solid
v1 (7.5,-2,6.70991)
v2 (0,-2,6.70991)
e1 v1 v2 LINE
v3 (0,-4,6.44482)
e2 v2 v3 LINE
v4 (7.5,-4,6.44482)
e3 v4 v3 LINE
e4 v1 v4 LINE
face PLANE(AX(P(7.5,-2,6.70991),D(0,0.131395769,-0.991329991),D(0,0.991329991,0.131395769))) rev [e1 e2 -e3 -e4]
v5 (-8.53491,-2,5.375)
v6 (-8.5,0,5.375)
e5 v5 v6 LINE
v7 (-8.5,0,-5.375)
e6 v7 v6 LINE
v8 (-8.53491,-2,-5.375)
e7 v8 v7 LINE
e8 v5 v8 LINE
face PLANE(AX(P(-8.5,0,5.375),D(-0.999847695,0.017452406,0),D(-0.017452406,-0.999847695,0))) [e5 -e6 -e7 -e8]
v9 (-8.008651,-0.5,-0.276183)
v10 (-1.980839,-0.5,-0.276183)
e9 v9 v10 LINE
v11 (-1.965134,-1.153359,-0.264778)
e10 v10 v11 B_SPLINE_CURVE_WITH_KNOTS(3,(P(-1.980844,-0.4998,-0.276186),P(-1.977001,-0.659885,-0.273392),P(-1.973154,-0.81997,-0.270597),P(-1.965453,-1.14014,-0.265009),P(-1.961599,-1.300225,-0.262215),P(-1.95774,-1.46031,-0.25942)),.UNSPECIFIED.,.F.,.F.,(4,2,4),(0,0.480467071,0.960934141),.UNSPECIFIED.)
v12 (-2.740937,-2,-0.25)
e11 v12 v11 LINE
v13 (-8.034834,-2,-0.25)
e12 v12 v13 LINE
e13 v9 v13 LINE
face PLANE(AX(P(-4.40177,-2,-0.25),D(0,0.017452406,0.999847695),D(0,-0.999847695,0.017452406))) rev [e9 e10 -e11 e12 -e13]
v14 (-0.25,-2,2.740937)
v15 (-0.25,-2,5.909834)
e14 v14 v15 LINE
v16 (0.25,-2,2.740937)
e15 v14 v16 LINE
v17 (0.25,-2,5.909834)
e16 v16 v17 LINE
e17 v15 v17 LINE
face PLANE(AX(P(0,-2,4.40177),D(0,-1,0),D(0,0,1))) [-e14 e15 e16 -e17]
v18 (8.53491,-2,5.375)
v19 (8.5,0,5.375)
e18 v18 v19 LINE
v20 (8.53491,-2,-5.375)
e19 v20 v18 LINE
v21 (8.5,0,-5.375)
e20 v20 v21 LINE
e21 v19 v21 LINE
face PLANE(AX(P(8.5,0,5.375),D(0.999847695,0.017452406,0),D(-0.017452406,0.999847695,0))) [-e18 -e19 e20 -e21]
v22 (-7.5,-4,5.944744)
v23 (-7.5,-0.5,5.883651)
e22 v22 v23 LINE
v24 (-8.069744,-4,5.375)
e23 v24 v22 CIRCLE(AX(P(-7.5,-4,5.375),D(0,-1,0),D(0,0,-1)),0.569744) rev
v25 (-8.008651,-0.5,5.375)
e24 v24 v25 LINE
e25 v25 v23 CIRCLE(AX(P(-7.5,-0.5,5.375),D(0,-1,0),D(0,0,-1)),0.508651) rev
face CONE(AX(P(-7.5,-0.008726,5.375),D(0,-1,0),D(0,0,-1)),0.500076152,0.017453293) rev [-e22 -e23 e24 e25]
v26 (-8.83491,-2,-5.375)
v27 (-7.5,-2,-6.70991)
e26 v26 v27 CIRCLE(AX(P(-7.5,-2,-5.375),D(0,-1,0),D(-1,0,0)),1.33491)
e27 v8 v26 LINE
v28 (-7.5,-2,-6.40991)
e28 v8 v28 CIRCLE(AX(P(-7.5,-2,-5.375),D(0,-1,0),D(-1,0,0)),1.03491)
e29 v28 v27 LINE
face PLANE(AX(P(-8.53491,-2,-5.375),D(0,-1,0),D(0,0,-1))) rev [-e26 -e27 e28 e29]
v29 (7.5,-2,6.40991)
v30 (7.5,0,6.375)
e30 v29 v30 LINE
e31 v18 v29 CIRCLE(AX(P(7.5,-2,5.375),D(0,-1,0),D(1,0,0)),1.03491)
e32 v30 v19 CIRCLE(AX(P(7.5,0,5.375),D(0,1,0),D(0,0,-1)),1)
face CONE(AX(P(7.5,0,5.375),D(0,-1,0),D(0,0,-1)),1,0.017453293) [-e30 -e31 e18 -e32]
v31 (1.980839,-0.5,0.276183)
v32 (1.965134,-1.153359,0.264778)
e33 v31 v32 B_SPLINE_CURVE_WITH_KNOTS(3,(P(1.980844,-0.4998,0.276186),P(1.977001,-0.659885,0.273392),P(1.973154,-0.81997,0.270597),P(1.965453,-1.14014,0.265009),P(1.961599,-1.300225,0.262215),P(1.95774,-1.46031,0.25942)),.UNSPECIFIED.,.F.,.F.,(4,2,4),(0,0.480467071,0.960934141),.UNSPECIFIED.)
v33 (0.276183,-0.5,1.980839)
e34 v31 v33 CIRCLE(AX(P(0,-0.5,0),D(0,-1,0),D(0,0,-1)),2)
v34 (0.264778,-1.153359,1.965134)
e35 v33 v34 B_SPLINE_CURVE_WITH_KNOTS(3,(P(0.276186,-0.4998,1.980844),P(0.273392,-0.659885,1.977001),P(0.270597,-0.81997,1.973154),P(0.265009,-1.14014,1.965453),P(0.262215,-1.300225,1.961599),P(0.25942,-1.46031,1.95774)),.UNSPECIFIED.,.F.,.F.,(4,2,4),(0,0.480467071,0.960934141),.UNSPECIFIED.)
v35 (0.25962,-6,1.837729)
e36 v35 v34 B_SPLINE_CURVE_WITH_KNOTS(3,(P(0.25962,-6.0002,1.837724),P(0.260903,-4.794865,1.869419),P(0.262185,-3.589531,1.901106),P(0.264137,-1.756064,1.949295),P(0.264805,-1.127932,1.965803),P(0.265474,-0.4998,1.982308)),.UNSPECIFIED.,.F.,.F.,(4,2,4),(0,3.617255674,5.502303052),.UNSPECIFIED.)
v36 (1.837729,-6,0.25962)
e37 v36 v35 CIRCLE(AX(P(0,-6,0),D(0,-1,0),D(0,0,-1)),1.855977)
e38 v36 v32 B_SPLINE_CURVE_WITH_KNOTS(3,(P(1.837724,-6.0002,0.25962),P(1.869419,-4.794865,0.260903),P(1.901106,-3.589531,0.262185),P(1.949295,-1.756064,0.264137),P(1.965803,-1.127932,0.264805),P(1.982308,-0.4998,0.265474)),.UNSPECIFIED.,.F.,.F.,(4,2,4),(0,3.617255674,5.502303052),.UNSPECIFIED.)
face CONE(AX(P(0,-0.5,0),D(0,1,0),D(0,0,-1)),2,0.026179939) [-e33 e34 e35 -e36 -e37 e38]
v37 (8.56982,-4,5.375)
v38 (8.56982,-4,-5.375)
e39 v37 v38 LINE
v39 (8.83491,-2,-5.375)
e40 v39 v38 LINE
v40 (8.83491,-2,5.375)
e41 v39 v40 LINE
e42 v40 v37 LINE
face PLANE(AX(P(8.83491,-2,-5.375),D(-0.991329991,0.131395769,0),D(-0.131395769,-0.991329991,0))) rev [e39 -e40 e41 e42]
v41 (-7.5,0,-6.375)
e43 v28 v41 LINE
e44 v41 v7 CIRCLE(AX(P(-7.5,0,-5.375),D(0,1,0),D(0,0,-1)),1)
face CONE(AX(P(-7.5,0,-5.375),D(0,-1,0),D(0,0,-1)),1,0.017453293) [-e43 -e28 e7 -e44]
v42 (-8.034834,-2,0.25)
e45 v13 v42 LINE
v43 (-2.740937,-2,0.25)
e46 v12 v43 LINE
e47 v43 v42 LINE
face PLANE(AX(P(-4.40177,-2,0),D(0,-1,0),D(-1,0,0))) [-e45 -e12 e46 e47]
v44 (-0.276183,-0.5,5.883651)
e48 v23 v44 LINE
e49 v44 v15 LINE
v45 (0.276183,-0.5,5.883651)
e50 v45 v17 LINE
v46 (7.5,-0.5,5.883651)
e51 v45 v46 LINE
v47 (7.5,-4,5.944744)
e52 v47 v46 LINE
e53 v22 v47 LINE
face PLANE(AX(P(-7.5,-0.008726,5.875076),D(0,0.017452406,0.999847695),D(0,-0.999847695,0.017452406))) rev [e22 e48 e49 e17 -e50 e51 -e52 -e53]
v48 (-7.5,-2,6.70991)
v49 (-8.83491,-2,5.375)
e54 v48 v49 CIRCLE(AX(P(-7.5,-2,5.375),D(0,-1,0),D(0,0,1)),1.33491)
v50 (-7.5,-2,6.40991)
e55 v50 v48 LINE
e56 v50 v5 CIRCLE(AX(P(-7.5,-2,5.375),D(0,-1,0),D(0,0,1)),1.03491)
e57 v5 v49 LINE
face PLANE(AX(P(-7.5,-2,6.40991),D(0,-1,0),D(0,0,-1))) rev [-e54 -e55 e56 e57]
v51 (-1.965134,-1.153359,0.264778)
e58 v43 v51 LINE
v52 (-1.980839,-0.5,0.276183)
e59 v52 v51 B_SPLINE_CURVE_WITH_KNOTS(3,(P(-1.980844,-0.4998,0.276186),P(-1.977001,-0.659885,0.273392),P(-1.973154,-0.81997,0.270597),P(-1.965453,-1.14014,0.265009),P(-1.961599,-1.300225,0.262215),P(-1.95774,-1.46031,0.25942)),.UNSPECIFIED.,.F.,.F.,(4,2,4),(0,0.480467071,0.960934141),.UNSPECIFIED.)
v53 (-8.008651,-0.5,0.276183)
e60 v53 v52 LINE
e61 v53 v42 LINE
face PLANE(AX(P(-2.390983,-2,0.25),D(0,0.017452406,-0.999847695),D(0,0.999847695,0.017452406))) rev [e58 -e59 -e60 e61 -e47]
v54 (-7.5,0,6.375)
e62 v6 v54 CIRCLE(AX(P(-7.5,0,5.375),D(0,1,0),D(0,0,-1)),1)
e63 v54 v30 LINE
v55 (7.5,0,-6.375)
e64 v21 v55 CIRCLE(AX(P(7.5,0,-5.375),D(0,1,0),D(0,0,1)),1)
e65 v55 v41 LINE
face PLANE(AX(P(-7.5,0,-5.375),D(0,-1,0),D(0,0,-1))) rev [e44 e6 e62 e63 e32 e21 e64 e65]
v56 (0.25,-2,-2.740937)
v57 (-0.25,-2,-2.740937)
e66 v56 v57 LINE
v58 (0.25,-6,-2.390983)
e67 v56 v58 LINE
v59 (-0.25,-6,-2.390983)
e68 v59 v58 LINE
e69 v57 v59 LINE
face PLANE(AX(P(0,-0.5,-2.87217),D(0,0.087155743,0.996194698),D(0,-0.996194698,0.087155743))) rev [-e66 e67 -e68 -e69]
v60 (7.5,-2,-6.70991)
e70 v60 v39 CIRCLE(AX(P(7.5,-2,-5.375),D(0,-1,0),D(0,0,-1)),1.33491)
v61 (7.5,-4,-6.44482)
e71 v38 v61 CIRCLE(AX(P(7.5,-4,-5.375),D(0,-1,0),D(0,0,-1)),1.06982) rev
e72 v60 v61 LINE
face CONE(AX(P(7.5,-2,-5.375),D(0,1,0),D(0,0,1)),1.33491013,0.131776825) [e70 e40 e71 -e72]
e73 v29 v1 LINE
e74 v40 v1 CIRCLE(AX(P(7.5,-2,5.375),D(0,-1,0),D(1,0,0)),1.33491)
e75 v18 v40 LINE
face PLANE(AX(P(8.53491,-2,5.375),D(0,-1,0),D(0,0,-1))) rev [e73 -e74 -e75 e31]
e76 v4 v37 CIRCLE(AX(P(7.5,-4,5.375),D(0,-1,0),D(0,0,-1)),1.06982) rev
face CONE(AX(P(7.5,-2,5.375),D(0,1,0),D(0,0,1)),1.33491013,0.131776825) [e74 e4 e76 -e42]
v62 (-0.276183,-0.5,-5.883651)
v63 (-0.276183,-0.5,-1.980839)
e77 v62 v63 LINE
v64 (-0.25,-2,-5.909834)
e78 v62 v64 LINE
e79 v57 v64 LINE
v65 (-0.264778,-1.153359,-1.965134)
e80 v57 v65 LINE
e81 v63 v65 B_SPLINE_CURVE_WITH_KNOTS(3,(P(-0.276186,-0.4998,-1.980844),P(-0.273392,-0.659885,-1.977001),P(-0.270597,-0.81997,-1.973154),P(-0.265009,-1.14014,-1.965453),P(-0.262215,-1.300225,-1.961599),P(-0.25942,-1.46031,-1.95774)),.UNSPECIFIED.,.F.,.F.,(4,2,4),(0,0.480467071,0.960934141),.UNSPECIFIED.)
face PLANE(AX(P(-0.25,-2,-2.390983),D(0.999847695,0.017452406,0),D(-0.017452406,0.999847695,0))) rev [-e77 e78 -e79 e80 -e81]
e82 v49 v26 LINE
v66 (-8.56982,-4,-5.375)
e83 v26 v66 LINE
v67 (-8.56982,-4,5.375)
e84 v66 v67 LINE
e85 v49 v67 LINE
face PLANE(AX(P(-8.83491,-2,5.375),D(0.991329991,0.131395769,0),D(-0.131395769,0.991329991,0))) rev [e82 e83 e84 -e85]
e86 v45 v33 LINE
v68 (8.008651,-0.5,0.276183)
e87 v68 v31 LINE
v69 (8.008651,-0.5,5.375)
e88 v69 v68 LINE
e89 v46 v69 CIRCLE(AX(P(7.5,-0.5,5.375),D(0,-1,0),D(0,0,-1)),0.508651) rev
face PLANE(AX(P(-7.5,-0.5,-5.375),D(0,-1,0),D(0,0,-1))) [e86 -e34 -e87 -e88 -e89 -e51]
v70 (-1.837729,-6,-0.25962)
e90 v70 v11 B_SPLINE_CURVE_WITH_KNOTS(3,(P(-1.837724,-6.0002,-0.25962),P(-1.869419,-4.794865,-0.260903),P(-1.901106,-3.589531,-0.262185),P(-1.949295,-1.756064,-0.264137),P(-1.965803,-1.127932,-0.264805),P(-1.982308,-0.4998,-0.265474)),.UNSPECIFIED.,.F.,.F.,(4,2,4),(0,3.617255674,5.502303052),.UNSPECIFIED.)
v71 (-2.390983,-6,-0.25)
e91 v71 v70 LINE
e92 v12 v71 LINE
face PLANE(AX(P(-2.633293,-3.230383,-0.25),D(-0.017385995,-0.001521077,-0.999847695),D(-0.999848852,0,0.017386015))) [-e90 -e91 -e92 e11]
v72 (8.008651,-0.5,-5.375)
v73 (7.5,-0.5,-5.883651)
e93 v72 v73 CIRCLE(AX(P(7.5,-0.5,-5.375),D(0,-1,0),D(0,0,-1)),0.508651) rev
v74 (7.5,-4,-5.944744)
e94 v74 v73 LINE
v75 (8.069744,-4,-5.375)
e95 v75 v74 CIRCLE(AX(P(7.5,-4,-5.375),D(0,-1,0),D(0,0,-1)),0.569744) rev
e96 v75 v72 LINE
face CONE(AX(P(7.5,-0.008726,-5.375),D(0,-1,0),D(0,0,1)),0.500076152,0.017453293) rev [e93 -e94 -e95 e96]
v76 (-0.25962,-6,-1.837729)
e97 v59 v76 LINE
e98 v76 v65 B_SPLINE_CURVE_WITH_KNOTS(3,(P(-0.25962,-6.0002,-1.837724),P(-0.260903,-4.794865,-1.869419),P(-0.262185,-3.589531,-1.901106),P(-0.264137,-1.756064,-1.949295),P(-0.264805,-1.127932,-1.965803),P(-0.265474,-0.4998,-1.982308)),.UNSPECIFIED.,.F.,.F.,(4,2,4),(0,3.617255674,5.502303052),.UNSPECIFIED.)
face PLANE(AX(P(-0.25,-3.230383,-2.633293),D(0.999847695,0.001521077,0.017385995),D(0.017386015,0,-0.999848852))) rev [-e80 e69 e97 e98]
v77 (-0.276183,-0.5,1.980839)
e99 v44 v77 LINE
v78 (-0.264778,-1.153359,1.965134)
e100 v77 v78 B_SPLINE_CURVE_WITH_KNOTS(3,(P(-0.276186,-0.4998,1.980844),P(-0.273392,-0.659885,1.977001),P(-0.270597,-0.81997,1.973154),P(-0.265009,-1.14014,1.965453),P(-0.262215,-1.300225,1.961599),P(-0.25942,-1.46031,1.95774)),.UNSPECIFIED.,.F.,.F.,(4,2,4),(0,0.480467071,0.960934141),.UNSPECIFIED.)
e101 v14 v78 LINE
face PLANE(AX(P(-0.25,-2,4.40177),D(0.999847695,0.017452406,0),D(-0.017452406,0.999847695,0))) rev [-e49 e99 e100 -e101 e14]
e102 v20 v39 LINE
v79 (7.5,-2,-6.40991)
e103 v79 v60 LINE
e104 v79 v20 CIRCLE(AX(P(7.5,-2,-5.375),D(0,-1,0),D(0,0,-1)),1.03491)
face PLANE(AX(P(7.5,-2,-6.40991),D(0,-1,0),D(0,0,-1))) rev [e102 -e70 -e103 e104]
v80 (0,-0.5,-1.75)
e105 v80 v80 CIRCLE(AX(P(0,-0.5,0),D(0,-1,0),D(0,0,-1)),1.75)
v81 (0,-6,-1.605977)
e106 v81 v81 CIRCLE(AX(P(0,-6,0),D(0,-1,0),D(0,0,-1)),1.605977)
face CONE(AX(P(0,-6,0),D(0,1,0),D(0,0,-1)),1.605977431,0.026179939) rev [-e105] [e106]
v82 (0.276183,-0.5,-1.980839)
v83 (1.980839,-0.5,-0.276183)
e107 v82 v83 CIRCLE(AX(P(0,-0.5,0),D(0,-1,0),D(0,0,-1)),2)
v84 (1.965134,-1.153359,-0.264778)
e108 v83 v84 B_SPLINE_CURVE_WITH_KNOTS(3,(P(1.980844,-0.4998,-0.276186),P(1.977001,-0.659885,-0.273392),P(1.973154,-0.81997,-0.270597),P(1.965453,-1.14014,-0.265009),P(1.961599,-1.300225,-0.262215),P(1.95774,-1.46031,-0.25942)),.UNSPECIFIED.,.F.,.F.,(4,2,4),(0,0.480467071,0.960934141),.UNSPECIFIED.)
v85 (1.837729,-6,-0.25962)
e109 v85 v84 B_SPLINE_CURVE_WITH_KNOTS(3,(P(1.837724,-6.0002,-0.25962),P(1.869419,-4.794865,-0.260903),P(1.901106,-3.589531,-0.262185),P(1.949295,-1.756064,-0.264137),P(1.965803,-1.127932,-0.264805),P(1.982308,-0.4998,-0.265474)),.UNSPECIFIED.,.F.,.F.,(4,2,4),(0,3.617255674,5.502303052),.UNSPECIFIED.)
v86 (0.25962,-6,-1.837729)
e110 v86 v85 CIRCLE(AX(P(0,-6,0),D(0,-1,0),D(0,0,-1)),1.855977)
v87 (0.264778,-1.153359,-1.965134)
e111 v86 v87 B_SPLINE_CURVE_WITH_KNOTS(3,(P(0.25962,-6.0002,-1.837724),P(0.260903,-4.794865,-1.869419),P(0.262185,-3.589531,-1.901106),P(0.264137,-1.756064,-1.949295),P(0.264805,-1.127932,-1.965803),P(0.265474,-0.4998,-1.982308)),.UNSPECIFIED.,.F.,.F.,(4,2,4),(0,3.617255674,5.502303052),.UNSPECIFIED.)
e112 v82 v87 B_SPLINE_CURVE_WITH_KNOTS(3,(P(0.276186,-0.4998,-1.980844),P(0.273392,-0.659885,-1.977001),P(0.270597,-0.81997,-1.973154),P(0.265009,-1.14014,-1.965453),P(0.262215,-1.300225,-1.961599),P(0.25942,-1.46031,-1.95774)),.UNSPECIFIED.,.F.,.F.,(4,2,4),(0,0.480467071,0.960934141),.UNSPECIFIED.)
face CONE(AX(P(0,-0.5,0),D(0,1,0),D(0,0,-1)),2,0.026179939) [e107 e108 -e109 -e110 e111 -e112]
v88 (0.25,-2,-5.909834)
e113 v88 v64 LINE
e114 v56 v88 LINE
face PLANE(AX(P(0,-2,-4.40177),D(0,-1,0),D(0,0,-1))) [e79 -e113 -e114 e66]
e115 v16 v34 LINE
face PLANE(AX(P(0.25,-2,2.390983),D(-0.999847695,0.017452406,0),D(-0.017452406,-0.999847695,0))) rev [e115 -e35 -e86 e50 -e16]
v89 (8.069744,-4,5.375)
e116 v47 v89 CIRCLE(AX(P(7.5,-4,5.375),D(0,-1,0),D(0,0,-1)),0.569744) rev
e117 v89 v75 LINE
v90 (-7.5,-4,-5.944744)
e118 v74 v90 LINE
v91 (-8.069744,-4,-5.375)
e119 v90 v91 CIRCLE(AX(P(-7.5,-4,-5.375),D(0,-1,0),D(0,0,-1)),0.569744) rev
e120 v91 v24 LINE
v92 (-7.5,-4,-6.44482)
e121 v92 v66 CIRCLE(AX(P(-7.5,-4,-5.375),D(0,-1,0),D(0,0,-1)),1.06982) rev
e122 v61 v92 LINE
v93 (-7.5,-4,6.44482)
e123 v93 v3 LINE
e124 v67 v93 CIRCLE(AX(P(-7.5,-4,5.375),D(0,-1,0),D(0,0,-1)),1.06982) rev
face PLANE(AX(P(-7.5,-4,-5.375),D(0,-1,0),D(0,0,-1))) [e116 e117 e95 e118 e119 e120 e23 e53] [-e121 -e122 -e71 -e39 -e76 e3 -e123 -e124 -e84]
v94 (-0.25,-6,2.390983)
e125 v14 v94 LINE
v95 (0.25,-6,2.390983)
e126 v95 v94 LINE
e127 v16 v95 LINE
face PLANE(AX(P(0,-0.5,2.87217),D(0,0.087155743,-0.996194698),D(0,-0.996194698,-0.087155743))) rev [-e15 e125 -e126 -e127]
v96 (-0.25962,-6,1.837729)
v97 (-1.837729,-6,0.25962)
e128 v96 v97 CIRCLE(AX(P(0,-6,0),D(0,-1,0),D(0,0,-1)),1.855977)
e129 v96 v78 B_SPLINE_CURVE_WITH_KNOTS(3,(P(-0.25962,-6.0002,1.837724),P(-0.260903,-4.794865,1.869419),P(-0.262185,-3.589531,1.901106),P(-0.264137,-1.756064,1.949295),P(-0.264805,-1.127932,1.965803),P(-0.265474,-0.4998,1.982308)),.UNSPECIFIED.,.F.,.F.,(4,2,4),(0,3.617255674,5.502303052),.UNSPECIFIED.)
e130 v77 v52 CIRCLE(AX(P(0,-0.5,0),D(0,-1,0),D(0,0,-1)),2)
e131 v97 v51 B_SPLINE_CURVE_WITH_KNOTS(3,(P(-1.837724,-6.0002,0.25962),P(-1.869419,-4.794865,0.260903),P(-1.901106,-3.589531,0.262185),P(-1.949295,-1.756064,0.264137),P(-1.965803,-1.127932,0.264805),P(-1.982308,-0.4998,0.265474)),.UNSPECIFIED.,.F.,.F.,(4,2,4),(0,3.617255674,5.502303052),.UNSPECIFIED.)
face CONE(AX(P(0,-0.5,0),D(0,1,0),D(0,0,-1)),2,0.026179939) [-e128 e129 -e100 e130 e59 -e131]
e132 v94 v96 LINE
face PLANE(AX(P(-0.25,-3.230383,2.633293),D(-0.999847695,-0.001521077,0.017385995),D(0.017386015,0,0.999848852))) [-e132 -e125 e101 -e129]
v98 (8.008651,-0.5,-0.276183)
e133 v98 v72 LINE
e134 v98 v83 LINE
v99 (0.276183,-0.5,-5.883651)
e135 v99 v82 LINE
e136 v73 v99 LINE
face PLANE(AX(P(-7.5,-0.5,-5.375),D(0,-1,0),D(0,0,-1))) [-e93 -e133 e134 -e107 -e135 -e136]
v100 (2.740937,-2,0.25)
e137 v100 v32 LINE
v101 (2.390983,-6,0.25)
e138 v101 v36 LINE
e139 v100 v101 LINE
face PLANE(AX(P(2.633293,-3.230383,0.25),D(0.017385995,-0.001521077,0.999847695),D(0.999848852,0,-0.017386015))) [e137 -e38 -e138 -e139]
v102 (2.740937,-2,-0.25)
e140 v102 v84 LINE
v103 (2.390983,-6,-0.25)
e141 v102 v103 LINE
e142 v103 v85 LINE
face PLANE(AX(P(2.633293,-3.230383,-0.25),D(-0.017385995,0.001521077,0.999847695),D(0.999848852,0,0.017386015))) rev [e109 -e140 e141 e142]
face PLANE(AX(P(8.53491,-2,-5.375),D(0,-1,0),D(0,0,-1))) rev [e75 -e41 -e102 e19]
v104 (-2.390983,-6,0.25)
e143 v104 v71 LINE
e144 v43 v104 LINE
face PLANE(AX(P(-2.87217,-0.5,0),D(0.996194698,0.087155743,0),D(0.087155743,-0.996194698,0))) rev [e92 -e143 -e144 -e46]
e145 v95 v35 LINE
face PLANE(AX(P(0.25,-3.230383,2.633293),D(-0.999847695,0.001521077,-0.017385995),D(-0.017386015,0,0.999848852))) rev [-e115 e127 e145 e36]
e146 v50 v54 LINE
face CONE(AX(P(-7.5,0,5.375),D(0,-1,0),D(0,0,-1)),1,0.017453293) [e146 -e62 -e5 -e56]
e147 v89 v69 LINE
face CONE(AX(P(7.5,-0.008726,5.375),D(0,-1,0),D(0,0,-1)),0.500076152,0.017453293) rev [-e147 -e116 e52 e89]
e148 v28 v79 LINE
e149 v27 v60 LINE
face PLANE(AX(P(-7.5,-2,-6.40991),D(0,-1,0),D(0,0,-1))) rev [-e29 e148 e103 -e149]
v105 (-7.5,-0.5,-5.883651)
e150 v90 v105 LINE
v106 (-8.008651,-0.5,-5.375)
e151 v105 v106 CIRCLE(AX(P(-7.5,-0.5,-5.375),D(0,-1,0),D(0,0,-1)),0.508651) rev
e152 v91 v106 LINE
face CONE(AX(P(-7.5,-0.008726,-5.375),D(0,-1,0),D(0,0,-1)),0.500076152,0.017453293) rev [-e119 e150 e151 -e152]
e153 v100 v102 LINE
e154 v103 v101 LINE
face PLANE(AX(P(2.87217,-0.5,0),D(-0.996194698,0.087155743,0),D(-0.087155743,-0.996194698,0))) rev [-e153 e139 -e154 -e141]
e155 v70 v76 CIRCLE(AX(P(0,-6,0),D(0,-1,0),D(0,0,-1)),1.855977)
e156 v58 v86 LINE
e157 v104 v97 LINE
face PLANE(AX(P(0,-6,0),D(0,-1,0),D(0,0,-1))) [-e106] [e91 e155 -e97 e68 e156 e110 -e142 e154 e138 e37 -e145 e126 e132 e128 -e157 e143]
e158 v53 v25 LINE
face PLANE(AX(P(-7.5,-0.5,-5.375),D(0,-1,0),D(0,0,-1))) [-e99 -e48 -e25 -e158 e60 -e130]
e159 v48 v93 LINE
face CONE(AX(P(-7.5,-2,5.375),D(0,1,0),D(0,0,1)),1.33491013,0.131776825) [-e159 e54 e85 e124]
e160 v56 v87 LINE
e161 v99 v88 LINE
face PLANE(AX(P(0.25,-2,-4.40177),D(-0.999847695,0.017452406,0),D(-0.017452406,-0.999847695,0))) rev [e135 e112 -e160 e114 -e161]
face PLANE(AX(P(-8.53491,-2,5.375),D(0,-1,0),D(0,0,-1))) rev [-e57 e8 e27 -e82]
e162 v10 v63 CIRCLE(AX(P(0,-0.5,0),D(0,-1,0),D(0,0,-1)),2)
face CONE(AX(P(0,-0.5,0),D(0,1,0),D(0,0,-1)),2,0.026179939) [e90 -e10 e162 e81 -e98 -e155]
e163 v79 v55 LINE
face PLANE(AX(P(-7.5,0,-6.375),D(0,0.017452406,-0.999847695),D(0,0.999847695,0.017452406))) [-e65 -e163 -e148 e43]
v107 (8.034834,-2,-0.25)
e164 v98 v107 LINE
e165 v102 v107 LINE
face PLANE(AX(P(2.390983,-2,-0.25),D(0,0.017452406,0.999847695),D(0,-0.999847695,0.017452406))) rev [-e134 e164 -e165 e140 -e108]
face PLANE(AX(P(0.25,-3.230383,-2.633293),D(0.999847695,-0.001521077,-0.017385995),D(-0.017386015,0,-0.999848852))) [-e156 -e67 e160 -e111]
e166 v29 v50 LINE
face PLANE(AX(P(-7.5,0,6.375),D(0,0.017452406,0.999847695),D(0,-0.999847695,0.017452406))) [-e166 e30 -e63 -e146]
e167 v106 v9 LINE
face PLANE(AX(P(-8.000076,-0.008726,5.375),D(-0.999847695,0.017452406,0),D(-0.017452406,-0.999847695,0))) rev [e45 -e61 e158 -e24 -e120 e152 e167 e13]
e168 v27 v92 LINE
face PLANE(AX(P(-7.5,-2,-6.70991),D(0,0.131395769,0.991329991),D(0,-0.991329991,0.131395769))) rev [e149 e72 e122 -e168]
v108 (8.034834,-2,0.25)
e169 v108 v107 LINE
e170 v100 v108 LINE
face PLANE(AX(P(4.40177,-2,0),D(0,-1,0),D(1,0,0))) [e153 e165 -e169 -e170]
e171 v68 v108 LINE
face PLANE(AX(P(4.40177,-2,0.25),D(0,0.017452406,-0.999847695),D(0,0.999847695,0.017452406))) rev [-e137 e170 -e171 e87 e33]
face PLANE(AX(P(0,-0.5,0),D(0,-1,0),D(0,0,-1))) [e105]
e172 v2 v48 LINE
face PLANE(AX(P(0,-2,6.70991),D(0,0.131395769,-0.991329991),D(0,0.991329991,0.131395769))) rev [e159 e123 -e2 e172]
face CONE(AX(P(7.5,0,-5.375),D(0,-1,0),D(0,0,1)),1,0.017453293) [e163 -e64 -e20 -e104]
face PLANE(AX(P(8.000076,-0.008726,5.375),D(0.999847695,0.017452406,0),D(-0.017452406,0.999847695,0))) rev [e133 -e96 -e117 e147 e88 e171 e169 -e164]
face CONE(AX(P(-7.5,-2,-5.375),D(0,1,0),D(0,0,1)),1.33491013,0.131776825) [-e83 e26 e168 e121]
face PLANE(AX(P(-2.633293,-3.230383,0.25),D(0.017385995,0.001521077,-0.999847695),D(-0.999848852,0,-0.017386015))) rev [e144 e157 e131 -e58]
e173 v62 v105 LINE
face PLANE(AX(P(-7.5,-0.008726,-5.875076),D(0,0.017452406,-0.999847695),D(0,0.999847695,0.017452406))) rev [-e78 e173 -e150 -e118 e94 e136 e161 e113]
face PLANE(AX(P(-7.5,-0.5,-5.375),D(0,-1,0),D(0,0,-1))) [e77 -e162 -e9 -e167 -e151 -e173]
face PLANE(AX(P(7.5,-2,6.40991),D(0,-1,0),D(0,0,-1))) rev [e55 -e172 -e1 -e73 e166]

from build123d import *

# Parameters (mm, degrees)
BOSS_EXTRUDE1_DEPTH = 4
BOSS_EXTRUDE1_DRAFT = 1
SHELL1_T            = -0.5
SKETCH2_R           = 2
BOSS_EXTRUDE2_DEPTH = 5.5
BOSS_EXTRUDE2_TAPER = 1.5
CIRPATTERN1_COUNT   = 4
SKETCH4_R           = 1.605977431
CUT_EXTRUDE1_DEPTH  = 5.5
CUT_EXTRUDE1_DRAFT  = 1.5
RIB2_START          = -8.069744096
RIB2_DEPTH          = 6.232014751
RIB2_START_2        = 1.837729345
RIB2_2_DEPTH        = 6.232014751
RIB2_START_3        = -0.25
RIB2_3_DEPTH        = 0.4999999
RIB2_START_4        = -5.909834066
RIB2_4_DEPTH        = 4.072104721
RIB2_5_DEPTH        = 4.072104621


with BuildPart() as part:
    # Sketch1 → Boss-Extrude1 (with draft: the straight prism first)
    with BuildSketch(Plane(origin=(0, 0, 0), x_dir=(1, 0, 0), z_dir=(0, 1, 0))):
        with BuildLine():
            Line((-7.5, -6.375), (7.5, -6.375))
            ThreePointArc((7.5, -6.375), (8.207106781, -6.082106781), (8.5, -5.375))
            Line((8.5, -5.375), (8.5, 5.375))
            ThreePointArc((8.5, 5.375), (8.207106781, 6.082106781), (7.5, 6.375))
            Line((7.5, 6.375), (-7.5, 6.375))
            ThreePointArc((-7.5, 6.375), (-8.207106781, 6.082106781), (-8.5, 5.375))
            Line((-8.5, 5.375), (-8.5, -5.375))
            ThreePointArc((-8.5, -5.375), (-8.207106781, -6.082106781), (-7.5, -6.375))
        make_face()
    extrude(amount=-BOSS_EXTRUDE1_DEPTH)
    # Boss-Extrude1: the draft: its side faces are tilted about the plane it starts from
    boss_extrude1_sides = [part.faces().sort_by_distance(p)[0] for p in [
        (0, -2, 6.375),
        (8.207106781, -2, 6.082106781),
        (8.5, -2, 0),
        (8.207106781, -2, -6.082106781),
        (0, -2, -6.375),
        (-8.207106781, -2, -6.082106781),
        (-8.5, -2, 0),
        (-8.207106781, -2, 6.082106781),
    ]]
    draft(boss_extrude1_sides, Plane(origin=(0, 0, 0), x_dir=(1, 0, 0), z_dir=(0, 1, 0)), BOSS_EXTRUDE1_DRAFT)

    # Shell1
    shell1_openings = [part.faces().sort_by_distance(p)[0] for p in [
        (0, -4, 0),
    ]]
    offset(amount=SHELL1_T, openings=shell1_openings, kind=Kind.INTERSECTION)

    # Sketch2 → Boss-Extrude2 (add)
    with BuildSketch(Plane.XZ.offset(0.5)):
        Circle(SKETCH2_R)
    extrude(amount=BOSS_EXTRUDE2_DEPTH, taper=BOSS_EXTRUDE2_TAPER)

    # Rib1: read off the stored shape, not the designer's step
    # Rib1: loft between two sections, ruled curve by curve
    rib1_from = [
        Edge.make_line((1.982302644, -0.5, 0.265473592), (2.872170331, -0.5, 0.25)),
        Edge.make_line((1.982302644, -0.5, -0.265473592), (2.872170331, -0.5, -0.25)),
        Edge.make_line((2.872170331, -0.5, -0.25), (2.872170331, -0.5, 0.25)),
        Edge.make_line((1.982302644, -0.5, -0.265473592), (1.982302644, -0.5, 0.265473592)),
    ]
    rib1_to = [
        Edge.make_line((1.837729445, -6, 0.259620323), (2.390982681, -6, 0.25)),
        Edge.make_line((1.837729445, -6, -0.259620323), (2.390982681, -6, -0.25)),
        Edge.make_line((2.390982681, -6, -0.25), (2.390982681, -6, 0.25)),
        Edge.make_line((1.837729445, -6, -0.259620323), (1.837729445, -6, 0.259620323)),
    ]
    rib1 = Solid(Shell([*[Face.make_surface_from_curves(rib1_from[k], rib1_to[k]) for k in range(4)], Face(Wire(rib1_from)), Face(Wire(rib1_to))]))
    add(rib1)

    # CirPattern1: Rib1 ×4 about axis
    cirpattern1_axis = Axis((0, 0, 0), (0, 1, 0))
    for i in range(1, CIRPATTERN1_COUNT):
        add(rib1.rotate(cirpattern1_axis, i * 360 / CIRPATTERN1_COUNT))


with BuildPart() as cut_extrude1_tool:
    # Sketch4 → Cut-Extrude1 (with draft: the straight prism first)
    with BuildSketch(Plane.XZ.offset(6)):
        Circle(SKETCH4_R)
    extrude(amount=-CUT_EXTRUDE1_DEPTH)
    # Cut-Extrude1: the draft: its side faces are tilted about the plane it starts from
    cut_extrude1_sides = [cut_extrude1_tool.faces().sort_by_distance(p)[0] for p in [
        (-1.605977431, -3.25, 0),
    ]]
    draft(cut_extrude1_sides, Plane.XZ.offset(6), CUT_EXTRUDE1_DRAFT)


with BuildPart() as part_1:
    add(part.part)

    # Cut-Extrude1: cut by cut_extrude1_tool
    add(cut_extrude1_tool.part, mode=Mode.SUBTRACT)

    # Sweep1: sweep along a path in Sketch6
    with BuildLine(Plane(origin=(0, -2, 0), x_dir=(1, 0, 0), z_dir=(0, 1, 0))) as sweep1_path:
        Line((8.56982026, -5.375), (8.56982026, 5.375))
        ThreePointArc((8.56982026, 5.375), (8.25647716, 6.13147716), (7.5, 6.44482026))
        Line((7.5, 6.44482026), (-7.5, 6.44482026))
        ThreePointArc((-7.5, 6.44482026), (-8.25647716, 6.13147716), (-8.56982026, 5.375))
        Line((-8.56982026, 5.375), (-8.56982026, -5.375))
        ThreePointArc((-8.56982026, -5.375), (-8.25647716, -6.13147716), (-7.5, -6.44482026))
        Line((-7.5, -6.44482026), (7.5, -6.44482026))
        ThreePointArc((7.5, -6.44482026), (8.25647716, -6.13147716), (8.56982026, -5.375))
    # Sketch5 → Sweep1 (sweep)
    with BuildSketch(Plane(origin=(0, 0, 0), x_dir=(0, 0, -1), z_dir=(1, 0, 0))):
        Polygon((-6.70991013, -2), (-6.44482026, -4), (-6.40991013, -2), align=None)
    sweep(path=sweep1_path.line)

    # Rib2: read off the stored shape, not the designer's step
    # Rib2 outline → Rib2 (add)
    with BuildSketch(Plane.YZ.offset(RIB2_START)):
        Polygon((-0.5, 0.276182597), (-2, 0.25), (-2, -0.25), (-0.5, -0.276182597), align=None)
    extrude(amount=RIB2_DEPTH)

    # Rib2 2 outline → Rib2 2 (add)
    with BuildSketch(Plane.YZ.offset(RIB2_START_2)):
        Polygon((-0.5, 0.276182597), (-2, 0.25), (-2, -0.25), (-0.5, -0.276182597), align=None)
    extrude(amount=RIB2_2_DEPTH)

    # Rib2 3 outline → Rib2 3 (add)
    with BuildSketch(Plane.YZ.offset(RIB2_START_3)):
        Polygon((-2, 2.740937336), (-0.5, 2.872170331), (-0.5, 5.883651368), (-2, 5.909833966), align=None)
        Polygon((-0.5, -5.883651368), (-0.5, -2.872170331), (-2, -2.740937336), (-2, -5.909833966), align=None)
    extrude(amount=RIB2_3_DEPTH)

    # Rib2 4 outline → Rib2 4 (add)
    with BuildSketch(Plane.XY.offset(RIB2_START_4)):
        Polygon((0.25, -2), (0.276182597, -0.5), (0.2499999, -0.5), align=None)
        Polygon((-0.276182597, -0.5), (-0.25, -2), (-0.25, -0.5), align=None)
    extrude(amount=RIB2_4_DEPTH)

    # Rib2 5 outline → Rib2 5 (add)
    with BuildSketch(Plane.XY.offset(RIB2_START_2)):
        Polygon((0.25, -2), (0.276182597, -0.5), (0.2499999, -0.5), align=None)
        Polygon((-0.276182597, -0.5), (-0.25, -2), (-0.25, -0.5), align=None)
    extrude(amount=RIB2_5_DEPTH)


solid = part_1.part
